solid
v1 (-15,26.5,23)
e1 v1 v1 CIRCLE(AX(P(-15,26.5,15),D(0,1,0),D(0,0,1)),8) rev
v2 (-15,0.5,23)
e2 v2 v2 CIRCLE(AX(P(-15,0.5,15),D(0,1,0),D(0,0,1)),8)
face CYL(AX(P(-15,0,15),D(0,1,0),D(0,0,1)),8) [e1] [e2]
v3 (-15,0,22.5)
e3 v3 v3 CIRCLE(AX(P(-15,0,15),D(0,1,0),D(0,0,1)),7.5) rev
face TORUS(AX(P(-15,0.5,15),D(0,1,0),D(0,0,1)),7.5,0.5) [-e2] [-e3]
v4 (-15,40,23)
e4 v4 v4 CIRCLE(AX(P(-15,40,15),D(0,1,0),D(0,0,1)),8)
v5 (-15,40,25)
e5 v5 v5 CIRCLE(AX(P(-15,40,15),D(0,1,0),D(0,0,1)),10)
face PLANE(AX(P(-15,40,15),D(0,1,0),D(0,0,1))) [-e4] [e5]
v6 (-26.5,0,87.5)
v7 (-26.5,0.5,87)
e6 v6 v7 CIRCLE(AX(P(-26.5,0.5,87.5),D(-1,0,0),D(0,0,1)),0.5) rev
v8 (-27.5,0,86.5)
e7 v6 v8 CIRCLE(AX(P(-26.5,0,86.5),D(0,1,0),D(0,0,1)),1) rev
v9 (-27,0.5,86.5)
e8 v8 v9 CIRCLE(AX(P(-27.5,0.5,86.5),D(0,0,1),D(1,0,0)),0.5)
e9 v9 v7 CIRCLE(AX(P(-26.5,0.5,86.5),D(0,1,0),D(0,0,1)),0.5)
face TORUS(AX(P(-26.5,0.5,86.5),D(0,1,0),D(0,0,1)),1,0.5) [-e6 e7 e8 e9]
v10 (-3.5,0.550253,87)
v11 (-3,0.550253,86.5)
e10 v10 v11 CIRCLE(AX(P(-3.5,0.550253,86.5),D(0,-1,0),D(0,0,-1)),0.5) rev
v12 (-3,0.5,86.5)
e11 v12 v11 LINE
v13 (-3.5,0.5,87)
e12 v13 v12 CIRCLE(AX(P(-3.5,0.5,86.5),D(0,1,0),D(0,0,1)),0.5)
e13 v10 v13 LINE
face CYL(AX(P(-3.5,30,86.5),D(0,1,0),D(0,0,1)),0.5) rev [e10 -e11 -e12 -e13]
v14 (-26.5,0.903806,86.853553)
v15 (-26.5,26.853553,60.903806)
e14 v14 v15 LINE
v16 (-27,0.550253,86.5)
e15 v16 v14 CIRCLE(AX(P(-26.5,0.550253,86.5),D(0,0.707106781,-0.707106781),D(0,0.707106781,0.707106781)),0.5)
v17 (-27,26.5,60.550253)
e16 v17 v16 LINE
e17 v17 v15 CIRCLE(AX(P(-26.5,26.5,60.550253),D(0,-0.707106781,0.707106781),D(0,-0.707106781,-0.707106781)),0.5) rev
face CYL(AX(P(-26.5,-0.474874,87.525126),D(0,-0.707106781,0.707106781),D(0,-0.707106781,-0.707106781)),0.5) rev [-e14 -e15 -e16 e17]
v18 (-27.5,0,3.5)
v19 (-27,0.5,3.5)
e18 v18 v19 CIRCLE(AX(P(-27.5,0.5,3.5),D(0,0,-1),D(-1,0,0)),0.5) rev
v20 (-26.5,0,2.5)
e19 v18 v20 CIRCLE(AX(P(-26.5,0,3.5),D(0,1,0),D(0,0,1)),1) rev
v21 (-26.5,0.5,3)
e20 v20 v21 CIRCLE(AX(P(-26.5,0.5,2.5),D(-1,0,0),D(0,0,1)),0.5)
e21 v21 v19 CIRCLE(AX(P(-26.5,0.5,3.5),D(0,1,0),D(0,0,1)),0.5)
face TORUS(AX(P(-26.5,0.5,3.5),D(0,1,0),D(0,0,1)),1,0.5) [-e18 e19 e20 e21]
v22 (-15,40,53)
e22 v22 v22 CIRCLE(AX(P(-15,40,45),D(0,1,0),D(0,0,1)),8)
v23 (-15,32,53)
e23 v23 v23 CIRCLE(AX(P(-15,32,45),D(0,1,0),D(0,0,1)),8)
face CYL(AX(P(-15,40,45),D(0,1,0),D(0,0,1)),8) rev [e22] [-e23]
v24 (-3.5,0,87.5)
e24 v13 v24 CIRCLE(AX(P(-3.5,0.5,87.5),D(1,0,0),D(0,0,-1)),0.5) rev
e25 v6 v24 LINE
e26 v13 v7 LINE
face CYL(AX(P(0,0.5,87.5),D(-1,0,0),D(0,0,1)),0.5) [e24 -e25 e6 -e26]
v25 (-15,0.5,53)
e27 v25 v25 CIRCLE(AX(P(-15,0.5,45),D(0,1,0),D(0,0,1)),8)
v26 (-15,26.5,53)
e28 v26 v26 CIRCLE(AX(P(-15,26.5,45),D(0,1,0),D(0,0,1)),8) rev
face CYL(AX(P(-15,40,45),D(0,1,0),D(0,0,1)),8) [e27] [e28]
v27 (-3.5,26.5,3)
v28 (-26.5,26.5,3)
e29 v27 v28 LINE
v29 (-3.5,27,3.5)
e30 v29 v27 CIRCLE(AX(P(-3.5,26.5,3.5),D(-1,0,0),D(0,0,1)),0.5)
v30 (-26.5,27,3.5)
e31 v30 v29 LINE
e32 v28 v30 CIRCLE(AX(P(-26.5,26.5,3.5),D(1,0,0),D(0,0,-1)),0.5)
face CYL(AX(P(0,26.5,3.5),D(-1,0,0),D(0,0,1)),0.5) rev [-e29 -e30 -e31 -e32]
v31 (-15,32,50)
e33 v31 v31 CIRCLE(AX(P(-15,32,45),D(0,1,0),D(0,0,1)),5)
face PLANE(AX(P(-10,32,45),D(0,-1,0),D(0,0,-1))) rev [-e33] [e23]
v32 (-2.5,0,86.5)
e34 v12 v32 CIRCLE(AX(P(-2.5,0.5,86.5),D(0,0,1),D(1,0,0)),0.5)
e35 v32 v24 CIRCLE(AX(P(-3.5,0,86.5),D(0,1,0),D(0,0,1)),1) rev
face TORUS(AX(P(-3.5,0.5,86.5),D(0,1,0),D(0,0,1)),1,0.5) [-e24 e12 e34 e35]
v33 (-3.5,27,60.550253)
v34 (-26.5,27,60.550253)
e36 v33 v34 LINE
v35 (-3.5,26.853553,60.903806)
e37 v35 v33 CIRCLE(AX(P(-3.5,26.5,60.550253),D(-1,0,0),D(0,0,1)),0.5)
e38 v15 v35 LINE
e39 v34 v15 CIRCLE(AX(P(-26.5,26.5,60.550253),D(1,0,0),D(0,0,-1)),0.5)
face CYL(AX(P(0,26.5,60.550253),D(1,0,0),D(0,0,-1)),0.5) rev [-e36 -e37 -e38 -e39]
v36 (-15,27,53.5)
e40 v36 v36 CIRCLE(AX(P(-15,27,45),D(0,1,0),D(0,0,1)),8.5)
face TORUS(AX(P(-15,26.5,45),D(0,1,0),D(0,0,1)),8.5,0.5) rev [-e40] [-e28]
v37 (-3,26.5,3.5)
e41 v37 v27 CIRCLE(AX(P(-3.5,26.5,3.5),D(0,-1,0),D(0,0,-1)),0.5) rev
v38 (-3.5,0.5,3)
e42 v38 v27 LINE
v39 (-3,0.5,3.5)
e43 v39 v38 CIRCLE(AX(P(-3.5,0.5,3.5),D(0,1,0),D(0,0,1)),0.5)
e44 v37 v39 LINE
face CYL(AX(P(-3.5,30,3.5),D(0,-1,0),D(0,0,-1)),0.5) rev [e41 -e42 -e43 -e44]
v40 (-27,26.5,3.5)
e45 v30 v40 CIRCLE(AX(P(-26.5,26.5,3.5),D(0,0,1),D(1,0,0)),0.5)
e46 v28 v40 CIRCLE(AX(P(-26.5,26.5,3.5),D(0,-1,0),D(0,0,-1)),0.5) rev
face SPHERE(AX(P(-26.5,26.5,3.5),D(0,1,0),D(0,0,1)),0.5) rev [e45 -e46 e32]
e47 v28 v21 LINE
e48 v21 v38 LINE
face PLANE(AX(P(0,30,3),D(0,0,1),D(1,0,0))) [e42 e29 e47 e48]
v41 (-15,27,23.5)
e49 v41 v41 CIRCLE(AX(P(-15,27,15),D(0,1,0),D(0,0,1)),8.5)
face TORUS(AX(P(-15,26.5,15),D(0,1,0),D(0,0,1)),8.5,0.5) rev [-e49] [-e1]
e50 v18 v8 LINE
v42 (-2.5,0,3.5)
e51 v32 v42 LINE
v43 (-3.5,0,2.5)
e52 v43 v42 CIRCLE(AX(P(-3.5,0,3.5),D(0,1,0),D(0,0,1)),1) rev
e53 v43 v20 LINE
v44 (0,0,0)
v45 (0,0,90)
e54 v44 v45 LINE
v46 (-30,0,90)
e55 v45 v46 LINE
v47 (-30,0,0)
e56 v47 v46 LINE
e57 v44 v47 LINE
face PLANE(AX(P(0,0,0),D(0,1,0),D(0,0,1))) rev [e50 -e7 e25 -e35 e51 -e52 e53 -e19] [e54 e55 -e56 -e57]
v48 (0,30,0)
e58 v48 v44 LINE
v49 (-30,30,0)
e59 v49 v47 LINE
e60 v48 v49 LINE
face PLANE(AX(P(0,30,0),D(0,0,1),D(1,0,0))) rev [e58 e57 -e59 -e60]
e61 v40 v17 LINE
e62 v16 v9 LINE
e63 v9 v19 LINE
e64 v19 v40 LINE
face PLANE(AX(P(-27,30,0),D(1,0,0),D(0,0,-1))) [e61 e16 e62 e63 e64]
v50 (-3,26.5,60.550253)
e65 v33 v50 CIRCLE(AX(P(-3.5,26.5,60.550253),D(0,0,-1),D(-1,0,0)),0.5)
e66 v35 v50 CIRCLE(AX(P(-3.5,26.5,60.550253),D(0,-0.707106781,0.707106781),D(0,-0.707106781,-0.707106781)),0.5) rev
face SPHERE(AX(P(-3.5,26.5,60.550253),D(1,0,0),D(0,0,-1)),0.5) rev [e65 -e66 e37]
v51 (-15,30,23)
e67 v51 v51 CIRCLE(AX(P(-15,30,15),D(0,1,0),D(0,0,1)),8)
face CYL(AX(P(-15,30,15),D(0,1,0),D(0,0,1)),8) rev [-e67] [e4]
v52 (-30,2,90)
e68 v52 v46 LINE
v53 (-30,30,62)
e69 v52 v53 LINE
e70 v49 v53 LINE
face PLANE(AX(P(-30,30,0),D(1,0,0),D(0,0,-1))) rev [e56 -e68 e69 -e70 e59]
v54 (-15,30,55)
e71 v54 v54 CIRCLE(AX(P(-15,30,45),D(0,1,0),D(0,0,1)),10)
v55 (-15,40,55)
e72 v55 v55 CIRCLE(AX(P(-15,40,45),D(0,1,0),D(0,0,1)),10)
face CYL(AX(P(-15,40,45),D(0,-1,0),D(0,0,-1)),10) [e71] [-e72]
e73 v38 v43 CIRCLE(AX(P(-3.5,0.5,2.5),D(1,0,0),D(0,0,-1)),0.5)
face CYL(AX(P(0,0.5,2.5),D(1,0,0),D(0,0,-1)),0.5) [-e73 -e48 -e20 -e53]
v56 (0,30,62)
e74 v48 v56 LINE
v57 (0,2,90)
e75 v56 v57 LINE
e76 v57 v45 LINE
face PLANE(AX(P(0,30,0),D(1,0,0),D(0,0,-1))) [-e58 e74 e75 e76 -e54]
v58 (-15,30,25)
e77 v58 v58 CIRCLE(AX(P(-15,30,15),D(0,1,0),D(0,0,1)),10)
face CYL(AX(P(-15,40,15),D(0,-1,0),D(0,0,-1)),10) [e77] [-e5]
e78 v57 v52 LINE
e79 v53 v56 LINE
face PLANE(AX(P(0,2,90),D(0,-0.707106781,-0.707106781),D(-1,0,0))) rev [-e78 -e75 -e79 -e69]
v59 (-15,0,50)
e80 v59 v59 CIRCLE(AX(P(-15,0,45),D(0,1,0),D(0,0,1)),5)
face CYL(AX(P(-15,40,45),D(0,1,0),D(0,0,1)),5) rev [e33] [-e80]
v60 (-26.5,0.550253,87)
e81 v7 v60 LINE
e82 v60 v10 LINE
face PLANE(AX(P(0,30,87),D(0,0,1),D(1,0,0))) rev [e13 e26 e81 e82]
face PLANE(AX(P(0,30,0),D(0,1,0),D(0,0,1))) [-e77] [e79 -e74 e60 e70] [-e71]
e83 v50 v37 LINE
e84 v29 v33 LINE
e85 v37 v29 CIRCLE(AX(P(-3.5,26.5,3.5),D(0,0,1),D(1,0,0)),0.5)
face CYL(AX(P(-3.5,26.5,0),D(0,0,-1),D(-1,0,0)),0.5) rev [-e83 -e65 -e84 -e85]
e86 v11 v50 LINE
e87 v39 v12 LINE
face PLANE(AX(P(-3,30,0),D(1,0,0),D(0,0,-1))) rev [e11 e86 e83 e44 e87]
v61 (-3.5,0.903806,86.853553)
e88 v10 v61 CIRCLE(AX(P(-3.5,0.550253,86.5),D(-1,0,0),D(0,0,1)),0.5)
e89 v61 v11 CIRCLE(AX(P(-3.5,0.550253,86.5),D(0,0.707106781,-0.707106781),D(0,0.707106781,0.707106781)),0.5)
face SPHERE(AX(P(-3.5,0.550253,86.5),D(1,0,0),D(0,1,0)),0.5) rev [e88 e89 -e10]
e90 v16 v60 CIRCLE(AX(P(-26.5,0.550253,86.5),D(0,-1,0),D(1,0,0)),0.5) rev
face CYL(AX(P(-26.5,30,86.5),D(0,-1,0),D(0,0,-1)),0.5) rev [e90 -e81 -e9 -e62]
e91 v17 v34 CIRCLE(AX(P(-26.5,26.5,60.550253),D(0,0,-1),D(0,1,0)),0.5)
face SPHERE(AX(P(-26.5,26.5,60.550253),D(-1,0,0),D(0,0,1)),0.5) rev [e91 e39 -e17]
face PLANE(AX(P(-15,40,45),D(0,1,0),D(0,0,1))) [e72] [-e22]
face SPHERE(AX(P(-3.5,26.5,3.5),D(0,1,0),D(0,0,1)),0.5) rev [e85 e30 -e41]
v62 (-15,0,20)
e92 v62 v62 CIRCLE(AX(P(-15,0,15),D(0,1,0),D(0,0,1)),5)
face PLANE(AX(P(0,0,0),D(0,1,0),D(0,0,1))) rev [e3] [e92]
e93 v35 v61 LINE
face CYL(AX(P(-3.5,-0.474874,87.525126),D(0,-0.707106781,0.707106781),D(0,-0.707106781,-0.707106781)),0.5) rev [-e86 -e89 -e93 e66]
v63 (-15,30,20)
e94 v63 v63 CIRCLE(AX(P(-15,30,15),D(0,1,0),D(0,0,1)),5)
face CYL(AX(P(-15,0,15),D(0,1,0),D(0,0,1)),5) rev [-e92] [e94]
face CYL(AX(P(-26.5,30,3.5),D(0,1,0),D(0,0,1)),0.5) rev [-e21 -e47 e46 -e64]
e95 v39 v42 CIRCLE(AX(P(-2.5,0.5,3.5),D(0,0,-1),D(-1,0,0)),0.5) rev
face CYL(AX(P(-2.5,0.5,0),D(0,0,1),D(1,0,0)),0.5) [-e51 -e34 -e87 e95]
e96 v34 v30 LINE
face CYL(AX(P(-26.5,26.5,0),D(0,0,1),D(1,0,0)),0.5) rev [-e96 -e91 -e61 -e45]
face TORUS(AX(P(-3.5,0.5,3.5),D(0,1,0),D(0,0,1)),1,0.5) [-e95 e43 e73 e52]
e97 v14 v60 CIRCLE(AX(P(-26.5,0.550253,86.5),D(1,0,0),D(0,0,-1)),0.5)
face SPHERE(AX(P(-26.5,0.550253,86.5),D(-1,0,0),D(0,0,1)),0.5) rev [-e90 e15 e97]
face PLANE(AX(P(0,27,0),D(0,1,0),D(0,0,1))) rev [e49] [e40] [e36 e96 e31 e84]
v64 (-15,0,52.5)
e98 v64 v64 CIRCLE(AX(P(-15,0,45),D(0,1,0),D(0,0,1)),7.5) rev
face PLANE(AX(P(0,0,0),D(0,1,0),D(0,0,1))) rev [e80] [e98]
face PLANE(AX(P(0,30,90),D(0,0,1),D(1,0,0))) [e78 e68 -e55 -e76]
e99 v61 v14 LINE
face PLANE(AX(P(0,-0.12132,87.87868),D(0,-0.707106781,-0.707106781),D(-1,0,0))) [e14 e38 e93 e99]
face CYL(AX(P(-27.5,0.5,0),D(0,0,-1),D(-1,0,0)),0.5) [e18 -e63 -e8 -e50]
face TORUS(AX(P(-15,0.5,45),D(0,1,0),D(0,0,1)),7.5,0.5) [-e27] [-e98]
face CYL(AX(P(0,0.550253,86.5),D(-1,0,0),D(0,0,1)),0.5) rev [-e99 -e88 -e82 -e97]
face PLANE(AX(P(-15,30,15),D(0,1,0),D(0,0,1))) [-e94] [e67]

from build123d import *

# Parameters (mm, degrees)
SKETCH1_W                               = 30
SKETCH1_H                               = 90
BOSS_EXTRUDE1_DEPTH                     = 30
SKETCH2_R                               = 10
BOSS_EXTRUDE5_DEPTH                     = 10
SKETCH5_R                               = 8
CUT_EXTRUDE1_DEPTH                      = 10
SKETCH8_R                               = 5
CUT_EXTRUDE3_DEPTH                      = 100.498743711
CBORE_FOR_M5_HEX_HEAD_BOLT1_D           = 10
CBORE_FOR_M5_HEX_HEAD_BOLT1_CBORE_D     = 16
CBORE_FOR_M5_HEX_HEAD_BOLT1_CBORE_DEPTH = 8
CHAMFER2_SIZE                           = 28
SHELL2_OUTLINE_W                        = 24
SHELL2_OUTLINE_H                        = 84
SHELL2_OUTLINE_R                        = 8
SHELL2_DEPTH                            = 0.757359313
SHELL2_START                            = -27
SHELL2_2_DEPTH                          = 24
SHELL2_START_2                          = 0.757359313
SHELL2_3_OUTLINE_R                      = 8
SHELL2_3_OUTLINE_R_2                    = 5
SHELL2_3_DEPTH                          = 26.242640687
FILLET1_R                               = 0.5


with BuildPart() as part:
    # Sketch1 → Boss-Extrude1 (new body)
    with BuildSketch(Plane(origin=(0, 0, 0), x_dir=(1, 0, 0), z_dir=(0, 1, 0))):
        with Locations((-15, -45)):
            Rectangle(SKETCH1_W, SKETCH1_H)
    extrude(amount=BOSS_EXTRUDE1_DEPTH)

    # Sketch2 → Boss-Extrude5 (add)
    with BuildSketch(Plane(origin=(0, 30, 0), x_dir=(1, 0, 0), z_dir=(0, 1, 0))):
        with Locations(Location((-15, -15, 0), (0, 0, 270))):
            Circle(SKETCH2_R)
        with Locations(Location((-15, -45, 0), (0, 0, 270))):
            Circle(SKETCH2_R)
    extrude(amount=BOSS_EXTRUDE5_DEPTH)

    # Sketch5 → Cut-Extrude1 (cut)
    with BuildSketch(Plane(origin=(0, 40, 0), x_dir=(1, 0, 0), z_dir=(0, 1, 0))):
        with Locations(Location((-15, -15, 0), (0, 0, 270))):
            Circle(SKETCH5_R)
    extrude(amount=-CUT_EXTRUDE1_DEPTH, mode=Mode.SUBTRACT)

    # Sketch8 → Cut-Extrude3 (cut, through all)
    with BuildSketch(Plane(origin=(0, 30, 0), x_dir=(1, 0, 0), z_dir=(0, 1, 0))):
        with Locations(Location((-15, -15, 0), (0, 0, 270))):
            Circle(SKETCH8_R)
    extrude(amount=-CUT_EXTRUDE3_DEPTH, mode=Mode.SUBTRACT)

    # CBORE for M5 Hex Head Bolt1 (through all)
    with Locations(Plane(origin=(0, 40, 0), x_dir=(1, 0, 0), z_dir=(0, 1, 0))):
        with Locations((-15, -45)):
            CounterBoreHole(CBORE_FOR_M5_HEX_HEAD_BOLT1_D / 2, CBORE_FOR_M5_HEX_HEAD_BOLT1_CBORE_D / 2, CBORE_FOR_M5_HEX_HEAD_BOLT1_CBORE_DEPTH)

    # Chamfer2
    chamfer2_edges = [part.edges().sort_by_distance(p)[0] for p in [
        (-15, 30, 90),
    ]]
    chamfer(chamfer2_edges, length=CHAMFER2_SIZE)

    # Shell2: read off the stored shape, not the designer's step
    # Shell2 outline → Shell2 (cut)
    with BuildSketch(Plane(origin=(0, 0, 0), x_dir=(1, 0, 0), z_dir=(0, 1, 0))):
        with Locations((-15, -45)):
            Rectangle(SHELL2_OUTLINE_W, SHELL2_OUTLINE_H)
        with Locations((-15, -45)):
            Circle(SHELL2_OUTLINE_R, mode=Mode.SUBTRACT)
        with Locations((-15, -15)):
            Circle(SHELL2_OUTLINE_R, mode=Mode.SUBTRACT)
    extrude(amount=SHELL2_DEPTH, mode=Mode.SUBTRACT)

    # Shell2 2 outline → Shell2 2 (cut)
    with BuildSketch(Plane.YZ.offset(SHELL2_START)):
        Polygon((0.757359313, 3), (27, 3), (27, 60.757359313), (0.757359313, 87), align=None)
    extrude(amount=SHELL2_2_DEPTH, mode=Mode.SUBTRACT)

    # Shell2 3 outline → Shell2 3 (add)
    # profile 1 of 2: a face of its own
    with BuildSketch(Plane(origin=(0, 0, 0), x_dir=(1, 0, 0), z_dir=(0, 1, 0)).offset(SHELL2_START_2)):
        with Locations((-15, -45)):
            Circle(SHELL2_3_OUTLINE_R)
        with Locations((-15, -45)):
            Circle(SHELL2_3_OUTLINE_R_2, mode=Mode.SUBTRACT)
    # profile 2 of 2: a face of its own
    with BuildSketch(Plane(origin=(0, 0, 0), x_dir=(1, 0, 0), z_dir=(0, 1, 0)).offset(SHELL2_START_2)):
        with Locations((-15, -15)):
            Circle(SHELL2_3_OUTLINE_R)
        with Locations((-15, -15)):
            Circle(SHELL2_3_OUTLINE_R_2, mode=Mode.SUBTRACT)
    extrude(amount=SHELL2_3_DEPTH)

    # Fillet1
    fillet1_edges = [part.edges().sort_by_distance(p)[0] for p in [
        (-23, 27, 45),
        (-15, 0, 3),
        (-3, 13.5, 3),
        (-27, 13.878679656, 73.878679656),
        (-27, 13.5, 3),
        (-27, 0, 45),
        (-15, 0.757359313, 87),
        (-27, 0.378679657, 87),
        (-3, 27, 31.878679657),
        (-3, 13.878679656, 73.878679656),
        (-3, 0.378679657, 87),
        (-27, 27, 31.878679657),
        (-15, 27, 60.757359313),
        (-15, 27, 3),
        (-23, 0, 45),
        (-23, 0, 15),
        (-3, 0, 45),
        (-15, 0, 87),
        (-23, 27, 15),
    ]]
    fillet(fillet1_edges, radius=FILLET1_R)


solid = part.part
